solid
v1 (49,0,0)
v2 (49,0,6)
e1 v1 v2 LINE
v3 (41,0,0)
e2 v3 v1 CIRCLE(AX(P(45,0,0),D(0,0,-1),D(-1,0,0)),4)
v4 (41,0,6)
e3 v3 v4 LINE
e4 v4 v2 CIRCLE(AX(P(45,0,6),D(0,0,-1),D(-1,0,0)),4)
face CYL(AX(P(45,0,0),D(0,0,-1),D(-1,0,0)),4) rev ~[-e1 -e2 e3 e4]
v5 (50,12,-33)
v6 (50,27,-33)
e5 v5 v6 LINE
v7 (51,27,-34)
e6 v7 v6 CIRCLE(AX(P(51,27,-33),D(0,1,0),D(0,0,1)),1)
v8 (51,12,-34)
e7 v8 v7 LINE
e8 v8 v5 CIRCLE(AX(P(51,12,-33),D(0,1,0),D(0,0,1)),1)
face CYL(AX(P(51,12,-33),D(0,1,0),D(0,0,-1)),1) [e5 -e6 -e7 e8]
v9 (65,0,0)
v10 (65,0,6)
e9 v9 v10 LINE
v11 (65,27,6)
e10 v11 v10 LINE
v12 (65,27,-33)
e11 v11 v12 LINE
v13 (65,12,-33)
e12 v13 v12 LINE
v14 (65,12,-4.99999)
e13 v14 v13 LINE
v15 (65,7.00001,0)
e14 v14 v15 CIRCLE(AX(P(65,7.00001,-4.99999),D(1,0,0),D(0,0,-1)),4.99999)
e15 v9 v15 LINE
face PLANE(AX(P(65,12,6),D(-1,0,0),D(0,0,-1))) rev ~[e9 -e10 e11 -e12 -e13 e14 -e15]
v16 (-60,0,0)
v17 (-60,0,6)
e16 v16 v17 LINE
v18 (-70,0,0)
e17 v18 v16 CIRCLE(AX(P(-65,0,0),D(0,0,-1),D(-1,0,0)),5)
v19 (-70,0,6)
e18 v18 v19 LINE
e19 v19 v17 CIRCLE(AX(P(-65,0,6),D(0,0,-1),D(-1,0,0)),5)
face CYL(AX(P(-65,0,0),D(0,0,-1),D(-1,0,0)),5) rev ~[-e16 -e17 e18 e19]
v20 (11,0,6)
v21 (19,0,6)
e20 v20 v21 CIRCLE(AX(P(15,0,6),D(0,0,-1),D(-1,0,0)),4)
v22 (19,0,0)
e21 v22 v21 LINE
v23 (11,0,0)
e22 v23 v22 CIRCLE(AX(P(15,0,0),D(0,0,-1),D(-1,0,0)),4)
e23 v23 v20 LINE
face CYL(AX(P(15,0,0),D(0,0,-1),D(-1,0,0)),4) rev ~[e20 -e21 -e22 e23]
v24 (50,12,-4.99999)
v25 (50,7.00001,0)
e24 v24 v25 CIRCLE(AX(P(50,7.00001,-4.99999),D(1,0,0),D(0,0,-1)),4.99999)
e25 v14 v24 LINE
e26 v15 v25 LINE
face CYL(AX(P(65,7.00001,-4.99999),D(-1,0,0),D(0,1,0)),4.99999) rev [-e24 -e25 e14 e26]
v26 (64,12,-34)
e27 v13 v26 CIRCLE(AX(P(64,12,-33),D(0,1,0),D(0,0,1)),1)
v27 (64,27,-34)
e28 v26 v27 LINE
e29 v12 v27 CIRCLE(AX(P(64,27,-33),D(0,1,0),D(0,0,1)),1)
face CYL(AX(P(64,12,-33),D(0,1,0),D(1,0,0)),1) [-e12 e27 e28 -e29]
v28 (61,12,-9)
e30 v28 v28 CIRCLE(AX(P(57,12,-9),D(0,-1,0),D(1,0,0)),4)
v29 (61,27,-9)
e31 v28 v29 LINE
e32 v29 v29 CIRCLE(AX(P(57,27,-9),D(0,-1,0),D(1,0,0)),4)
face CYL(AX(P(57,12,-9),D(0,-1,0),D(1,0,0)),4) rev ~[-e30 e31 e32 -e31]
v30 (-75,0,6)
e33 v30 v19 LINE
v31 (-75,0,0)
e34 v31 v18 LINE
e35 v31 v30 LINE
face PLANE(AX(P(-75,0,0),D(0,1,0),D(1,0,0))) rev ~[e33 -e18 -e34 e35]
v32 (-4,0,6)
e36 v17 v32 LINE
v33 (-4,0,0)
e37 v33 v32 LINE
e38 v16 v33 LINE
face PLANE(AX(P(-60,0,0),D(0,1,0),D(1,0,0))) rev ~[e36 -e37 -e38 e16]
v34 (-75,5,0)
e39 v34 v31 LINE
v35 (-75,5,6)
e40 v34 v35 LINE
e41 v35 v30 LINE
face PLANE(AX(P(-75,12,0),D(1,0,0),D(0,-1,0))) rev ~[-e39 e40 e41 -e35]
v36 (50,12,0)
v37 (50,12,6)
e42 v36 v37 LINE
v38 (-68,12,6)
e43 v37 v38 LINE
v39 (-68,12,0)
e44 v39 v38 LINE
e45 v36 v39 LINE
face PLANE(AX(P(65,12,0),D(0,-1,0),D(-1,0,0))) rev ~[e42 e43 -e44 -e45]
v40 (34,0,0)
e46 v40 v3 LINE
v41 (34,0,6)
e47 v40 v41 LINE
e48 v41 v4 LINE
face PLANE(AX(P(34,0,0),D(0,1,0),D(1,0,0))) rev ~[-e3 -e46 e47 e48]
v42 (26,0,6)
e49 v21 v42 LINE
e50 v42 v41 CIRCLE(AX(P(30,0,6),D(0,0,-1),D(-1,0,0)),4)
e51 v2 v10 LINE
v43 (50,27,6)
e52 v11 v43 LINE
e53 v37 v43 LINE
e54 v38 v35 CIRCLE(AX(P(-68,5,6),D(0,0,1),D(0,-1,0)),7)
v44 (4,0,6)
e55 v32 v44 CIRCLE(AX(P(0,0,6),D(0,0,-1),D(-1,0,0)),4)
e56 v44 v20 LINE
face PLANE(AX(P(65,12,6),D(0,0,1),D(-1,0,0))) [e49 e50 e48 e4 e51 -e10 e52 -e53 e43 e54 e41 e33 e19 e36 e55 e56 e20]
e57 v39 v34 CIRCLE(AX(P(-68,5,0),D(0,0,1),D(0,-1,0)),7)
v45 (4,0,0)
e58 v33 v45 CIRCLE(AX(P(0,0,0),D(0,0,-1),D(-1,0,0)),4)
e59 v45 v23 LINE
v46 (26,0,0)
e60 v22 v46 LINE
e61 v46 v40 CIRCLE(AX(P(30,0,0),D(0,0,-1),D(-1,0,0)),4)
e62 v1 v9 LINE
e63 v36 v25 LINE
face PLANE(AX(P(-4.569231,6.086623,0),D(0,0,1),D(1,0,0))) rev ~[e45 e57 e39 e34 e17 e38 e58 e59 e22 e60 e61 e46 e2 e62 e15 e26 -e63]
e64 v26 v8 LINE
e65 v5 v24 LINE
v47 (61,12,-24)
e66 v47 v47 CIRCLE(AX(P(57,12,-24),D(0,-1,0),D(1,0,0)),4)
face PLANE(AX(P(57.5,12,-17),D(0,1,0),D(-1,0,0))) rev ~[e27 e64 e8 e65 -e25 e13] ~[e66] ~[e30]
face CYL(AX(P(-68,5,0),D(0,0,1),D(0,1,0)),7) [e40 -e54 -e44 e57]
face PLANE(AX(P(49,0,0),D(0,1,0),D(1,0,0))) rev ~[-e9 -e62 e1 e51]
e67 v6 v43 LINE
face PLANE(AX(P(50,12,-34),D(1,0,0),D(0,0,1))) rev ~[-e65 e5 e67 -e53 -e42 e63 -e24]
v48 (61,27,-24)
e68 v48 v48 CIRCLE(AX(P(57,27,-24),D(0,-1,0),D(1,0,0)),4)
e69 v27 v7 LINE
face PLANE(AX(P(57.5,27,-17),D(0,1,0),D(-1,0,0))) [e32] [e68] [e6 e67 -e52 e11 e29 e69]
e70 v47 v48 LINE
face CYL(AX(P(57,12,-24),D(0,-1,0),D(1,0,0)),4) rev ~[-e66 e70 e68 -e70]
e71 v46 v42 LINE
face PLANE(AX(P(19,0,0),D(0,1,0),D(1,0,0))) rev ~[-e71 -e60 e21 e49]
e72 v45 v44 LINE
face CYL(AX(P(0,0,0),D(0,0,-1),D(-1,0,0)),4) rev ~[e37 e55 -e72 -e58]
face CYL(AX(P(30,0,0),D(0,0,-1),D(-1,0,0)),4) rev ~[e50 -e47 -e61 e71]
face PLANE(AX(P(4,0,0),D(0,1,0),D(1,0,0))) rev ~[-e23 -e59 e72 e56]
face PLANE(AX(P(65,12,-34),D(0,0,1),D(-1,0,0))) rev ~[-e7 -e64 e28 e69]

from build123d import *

# Parameters (mm, degrees)
F1_DEPTH = 6
F2_R     = 7
F3_W     = 15
F3_H     = 34
F3_H_2   = 6
F4_DEPTH = 15
F5_R     = 4
F6_DEPTH = 25
F7_R     = 4.99999
F8_R     = 1


# Not quite as in the source:
# - a fillet or chamfer is up to 0.001 mm smaller than in the source, because OpenCascade refuses the exact size


with BuildPart() as f1:
    # F0 (on Top) → F1 (new body)
    with BuildSketch(Plane.XY):
        with BuildLine():
            ThreePointArc((-70, 0), (-65, 5), (-60, 0))
            Line((-60, 0), (-4, 0))
            ThreePointArc((-4, 0), (0, 4), (4, 0))
            Line((4, 0), (11, 0))
            ThreePointArc((11, 0), (15, 4), (19, 0))
            Line((19, 0), (26, 0))
            ThreePointArc((26, 0), (30, 4), (34, 0))
            Line((34, 0), (41, 0))
            ThreePointArc((41, 0), (45, 4), (49, 0))
            Line((49, 0), (65, 0))
            Line((65, 0), (65, 12))
            Line((65, 12), (-75, 12))
            Line((-75, 12), (-75, 0))
            Line((-75, 0), (-70, 0))
        make_face()
    extrude(amount=F1_DEPTH)

    # F2
    f2_edges = [f1.edges().sort_by_distance(p)[0] for p in [
        (-75, 12, 3),
    ]]
    fillet(f2_edges, radius=F2_R)

    # F3 (on face) → F4 (join)
    with BuildSketch(Plane(origin=(0, 12, 0), x_dir=(-1, 0, 0), z_dir=(0, 1, 0))):
        with Locations((-57.5, -17)):
            Rectangle(F3_W, F3_H)
        with Locations((-57.5, 3)):
            Rectangle(F3_W, F3_H_2)
    extrude(amount=F4_DEPTH)

    # F5 (on face) → F6 (cut)
    with BuildSketch(Plane.XZ.offset(-12)):
        with Locations((57, -9)):
            Circle(F5_R)
        with Locations((57, -24)):
            Circle(F5_R)
    extrude(amount=-F6_DEPTH, mode=Mode.SUBTRACT)

    # F7 (radius 5 in the source; OpenCascade refuses exactly that, so slightly less here)
    f7_edges = [f1.edges().sort_by_distance(p)[0] for p in [
        (57.5, 12, 0),
    ]]
    fillet(f7_edges, radius=F7_R)

    # F8
    f8_edges = [f1.edges().sort_by_distance(p)[0] for p in [
        (65, 19.5, -34),
        (50, 19.5, -34),
    ]]
    fillet(f8_edges, radius=F8_R)


solid = f1.part
